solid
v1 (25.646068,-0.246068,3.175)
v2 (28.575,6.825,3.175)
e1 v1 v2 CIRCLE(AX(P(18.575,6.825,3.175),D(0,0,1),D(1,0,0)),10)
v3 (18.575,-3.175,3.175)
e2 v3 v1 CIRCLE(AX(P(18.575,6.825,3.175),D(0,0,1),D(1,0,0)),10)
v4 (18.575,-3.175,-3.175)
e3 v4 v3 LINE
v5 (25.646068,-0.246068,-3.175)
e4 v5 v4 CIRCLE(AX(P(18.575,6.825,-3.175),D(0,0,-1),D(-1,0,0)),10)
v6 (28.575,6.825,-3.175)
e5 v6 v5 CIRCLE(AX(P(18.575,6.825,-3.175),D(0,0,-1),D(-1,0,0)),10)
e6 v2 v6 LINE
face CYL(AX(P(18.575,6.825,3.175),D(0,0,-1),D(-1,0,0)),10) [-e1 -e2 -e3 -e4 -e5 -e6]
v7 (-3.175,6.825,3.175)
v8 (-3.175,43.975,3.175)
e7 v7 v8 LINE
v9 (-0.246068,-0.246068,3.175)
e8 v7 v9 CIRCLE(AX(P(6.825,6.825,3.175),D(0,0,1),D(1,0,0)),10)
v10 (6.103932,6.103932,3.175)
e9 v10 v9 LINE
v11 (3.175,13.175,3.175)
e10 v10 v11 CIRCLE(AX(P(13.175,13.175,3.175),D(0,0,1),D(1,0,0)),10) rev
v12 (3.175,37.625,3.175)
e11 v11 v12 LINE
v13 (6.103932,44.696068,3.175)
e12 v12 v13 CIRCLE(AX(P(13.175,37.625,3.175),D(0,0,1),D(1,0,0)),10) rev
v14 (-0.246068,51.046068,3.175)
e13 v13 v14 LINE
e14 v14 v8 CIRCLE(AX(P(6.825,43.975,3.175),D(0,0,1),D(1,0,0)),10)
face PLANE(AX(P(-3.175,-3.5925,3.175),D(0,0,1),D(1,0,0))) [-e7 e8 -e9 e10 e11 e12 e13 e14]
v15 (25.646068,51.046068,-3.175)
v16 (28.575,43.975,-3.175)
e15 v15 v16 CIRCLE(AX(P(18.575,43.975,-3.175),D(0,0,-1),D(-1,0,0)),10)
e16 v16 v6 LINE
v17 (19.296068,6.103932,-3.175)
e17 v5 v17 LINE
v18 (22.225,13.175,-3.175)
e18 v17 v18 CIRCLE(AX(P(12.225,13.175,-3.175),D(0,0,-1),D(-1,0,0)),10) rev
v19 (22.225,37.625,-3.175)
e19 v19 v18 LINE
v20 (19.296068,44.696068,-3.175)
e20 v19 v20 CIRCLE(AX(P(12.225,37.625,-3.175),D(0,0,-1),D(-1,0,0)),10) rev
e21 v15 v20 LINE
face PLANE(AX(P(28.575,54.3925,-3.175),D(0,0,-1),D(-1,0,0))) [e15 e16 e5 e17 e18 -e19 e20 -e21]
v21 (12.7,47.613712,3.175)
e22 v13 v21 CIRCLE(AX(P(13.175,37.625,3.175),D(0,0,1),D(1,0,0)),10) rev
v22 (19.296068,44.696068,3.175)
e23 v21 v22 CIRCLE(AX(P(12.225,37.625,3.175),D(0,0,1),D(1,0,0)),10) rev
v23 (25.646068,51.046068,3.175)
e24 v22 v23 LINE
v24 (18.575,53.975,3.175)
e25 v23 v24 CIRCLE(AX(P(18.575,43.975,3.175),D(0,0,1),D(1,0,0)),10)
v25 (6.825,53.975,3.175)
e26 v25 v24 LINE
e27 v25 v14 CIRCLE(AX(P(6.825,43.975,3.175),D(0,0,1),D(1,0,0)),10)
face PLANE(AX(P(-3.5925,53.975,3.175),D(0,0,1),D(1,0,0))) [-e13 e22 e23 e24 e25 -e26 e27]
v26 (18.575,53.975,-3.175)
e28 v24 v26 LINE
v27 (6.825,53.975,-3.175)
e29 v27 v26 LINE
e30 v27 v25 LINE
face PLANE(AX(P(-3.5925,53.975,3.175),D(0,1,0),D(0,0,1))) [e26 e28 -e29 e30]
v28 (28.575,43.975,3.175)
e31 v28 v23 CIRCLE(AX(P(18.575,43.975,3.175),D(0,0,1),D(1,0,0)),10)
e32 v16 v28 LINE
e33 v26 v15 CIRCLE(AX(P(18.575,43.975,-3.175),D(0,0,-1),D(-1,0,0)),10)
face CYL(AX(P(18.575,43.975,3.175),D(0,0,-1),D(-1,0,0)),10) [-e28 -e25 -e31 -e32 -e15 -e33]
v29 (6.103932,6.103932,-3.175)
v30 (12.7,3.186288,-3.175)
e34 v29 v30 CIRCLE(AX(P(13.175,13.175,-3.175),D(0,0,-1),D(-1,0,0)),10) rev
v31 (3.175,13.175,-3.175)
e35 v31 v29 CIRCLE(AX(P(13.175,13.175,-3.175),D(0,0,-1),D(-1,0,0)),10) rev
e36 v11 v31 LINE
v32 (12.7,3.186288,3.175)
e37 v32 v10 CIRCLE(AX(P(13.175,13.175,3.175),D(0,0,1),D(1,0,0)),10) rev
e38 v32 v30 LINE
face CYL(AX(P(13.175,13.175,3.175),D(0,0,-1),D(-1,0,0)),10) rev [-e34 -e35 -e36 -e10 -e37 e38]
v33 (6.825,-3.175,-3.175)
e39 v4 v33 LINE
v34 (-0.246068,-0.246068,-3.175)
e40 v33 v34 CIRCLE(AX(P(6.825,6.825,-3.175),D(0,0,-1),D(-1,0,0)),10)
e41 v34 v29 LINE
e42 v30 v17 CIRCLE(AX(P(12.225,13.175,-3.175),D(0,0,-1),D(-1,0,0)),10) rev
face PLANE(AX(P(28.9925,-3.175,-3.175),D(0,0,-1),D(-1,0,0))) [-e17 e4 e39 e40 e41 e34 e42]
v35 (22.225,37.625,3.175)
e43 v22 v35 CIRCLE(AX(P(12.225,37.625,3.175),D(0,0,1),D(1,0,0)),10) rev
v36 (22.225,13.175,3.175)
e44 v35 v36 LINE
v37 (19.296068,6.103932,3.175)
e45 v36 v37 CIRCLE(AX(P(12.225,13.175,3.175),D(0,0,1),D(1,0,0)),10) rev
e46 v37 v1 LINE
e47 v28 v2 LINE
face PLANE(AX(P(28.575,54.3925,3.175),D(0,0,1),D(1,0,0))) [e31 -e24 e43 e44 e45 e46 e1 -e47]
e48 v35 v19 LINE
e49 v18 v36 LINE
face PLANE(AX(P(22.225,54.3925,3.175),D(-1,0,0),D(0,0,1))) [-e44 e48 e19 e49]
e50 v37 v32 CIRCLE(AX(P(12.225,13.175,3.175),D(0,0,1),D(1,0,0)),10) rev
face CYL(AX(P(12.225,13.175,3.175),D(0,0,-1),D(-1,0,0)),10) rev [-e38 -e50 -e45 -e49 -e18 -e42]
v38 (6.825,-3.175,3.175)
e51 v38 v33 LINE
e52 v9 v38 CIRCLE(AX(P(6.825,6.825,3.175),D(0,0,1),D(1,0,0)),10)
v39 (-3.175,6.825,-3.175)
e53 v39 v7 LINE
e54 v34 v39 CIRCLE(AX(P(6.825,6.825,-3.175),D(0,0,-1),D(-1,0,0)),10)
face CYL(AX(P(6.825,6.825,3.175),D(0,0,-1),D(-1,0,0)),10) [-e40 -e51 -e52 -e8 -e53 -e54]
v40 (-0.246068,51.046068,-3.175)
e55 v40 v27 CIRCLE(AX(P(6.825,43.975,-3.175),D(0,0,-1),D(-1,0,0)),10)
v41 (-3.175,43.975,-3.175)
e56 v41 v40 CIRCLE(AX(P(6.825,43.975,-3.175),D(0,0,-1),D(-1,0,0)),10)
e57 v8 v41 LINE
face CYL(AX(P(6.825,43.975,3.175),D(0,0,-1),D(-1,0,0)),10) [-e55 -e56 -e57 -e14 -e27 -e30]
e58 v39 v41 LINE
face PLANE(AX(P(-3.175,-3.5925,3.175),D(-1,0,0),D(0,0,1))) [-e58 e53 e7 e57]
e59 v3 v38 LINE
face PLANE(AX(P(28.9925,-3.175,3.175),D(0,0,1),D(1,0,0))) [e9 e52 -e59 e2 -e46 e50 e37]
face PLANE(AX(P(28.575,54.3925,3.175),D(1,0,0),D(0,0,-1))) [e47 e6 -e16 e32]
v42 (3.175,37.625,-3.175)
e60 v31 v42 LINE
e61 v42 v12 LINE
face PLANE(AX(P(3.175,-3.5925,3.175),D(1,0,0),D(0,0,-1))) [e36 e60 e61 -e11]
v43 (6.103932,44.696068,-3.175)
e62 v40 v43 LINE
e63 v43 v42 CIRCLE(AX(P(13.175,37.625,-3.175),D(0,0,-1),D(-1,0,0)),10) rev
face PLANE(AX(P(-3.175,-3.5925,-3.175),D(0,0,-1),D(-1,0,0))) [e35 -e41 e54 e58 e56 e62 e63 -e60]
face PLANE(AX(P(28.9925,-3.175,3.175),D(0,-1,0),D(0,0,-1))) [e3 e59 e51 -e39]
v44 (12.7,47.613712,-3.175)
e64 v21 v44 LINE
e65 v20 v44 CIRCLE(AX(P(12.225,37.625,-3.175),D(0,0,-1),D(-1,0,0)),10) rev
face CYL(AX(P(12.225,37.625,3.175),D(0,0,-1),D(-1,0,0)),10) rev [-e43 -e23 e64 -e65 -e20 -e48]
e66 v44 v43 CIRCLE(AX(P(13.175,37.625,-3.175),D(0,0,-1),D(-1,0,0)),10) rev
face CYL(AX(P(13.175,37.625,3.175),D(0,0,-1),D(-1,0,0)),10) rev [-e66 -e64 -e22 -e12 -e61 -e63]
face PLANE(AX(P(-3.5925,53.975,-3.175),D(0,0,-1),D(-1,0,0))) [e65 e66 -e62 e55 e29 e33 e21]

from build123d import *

# Parameters (mm, degrees)
SWEEP1_START       = -3.175
SWEEP1_OUTLINE_W   = 31.75
SWEEP1_OUTLINE_H   = 57.15
SWEEP1_OUTLINE_W_2 = 19.05
SWEEP1_OUTLINE_H_2 = 44.45
SWEEP1_DEPTH       = 6.35
FILLET1_R          = 10
FILLET2_R          = 10


# Read off the part's stored shape, not the designer's step: Sweep1
with BuildPart() as part:
    # Sweep1 outline → Sweep1 (new body)
    with BuildSketch(Plane.XY.offset(SWEEP1_START)):
        with Locations((12.7, 25.4)):
            Rectangle(SWEEP1_OUTLINE_W, SWEEP1_OUTLINE_H)
        with Locations((12.7, 25.4)):
            Rectangle(SWEEP1_OUTLINE_W_2, SWEEP1_OUTLINE_H_2, mode=Mode.SUBTRACT)
    extrude(amount=SWEEP1_DEPTH)

    # Fillet1
    # the kernel refuses this fillet: 10 mm, written as the material it adds along each edge
    with BuildSketch(Plane(origin=(3.175, 3.175, -3.175), x_dir=(1, 0, 0), z_dir=(0, 0, 1)), Plane(origin=(22.225, 3.175, -3.175), x_dir=(0, 1, 0), z_dir=(0, 0, 1)), Plane(origin=(22.225, 47.625, -3.175), x_dir=(-1, 0, 0), z_dir=(0, 0, 1))) as fillet1_piece_1:
        with BuildLine():
            CenterArc((FILLET1_R, FILLET1_R), FILLET1_R, 180, 90)
            Line((0, FILLET1_R), (0, 0))
            Line((0, 0), (FILLET1_R, 0))
        make_face()
    extrude(amount=6.35)
    with BuildSketch(Plane(origin=(3.175, 47.625, -3.175), x_dir=(1, 0, 0), z_dir=(0, 0, 1))) as fillet1_piece_2:
        with BuildLine():
            CenterArc((FILLET1_R, -FILLET1_R), FILLET1_R, 90, 90)
            Line((0, -FILLET1_R), (0, 0))
            Line((0, 0), (FILLET1_R, 0))
        make_face()
    extrude(amount=6.35)

    # Fillet2
    fillet2_edges = [part.edges().sort_by_distance(p)[0] for p in [
        (28.575, -3.175, 0),
        (-3.175, 53.975, 0),
        (-3.175, -3.175, 0),
        (28.575, 53.975, 0),
    ]]
    fillet(fillet2_edges, radius=FILLET2_R)


solid = part.part
